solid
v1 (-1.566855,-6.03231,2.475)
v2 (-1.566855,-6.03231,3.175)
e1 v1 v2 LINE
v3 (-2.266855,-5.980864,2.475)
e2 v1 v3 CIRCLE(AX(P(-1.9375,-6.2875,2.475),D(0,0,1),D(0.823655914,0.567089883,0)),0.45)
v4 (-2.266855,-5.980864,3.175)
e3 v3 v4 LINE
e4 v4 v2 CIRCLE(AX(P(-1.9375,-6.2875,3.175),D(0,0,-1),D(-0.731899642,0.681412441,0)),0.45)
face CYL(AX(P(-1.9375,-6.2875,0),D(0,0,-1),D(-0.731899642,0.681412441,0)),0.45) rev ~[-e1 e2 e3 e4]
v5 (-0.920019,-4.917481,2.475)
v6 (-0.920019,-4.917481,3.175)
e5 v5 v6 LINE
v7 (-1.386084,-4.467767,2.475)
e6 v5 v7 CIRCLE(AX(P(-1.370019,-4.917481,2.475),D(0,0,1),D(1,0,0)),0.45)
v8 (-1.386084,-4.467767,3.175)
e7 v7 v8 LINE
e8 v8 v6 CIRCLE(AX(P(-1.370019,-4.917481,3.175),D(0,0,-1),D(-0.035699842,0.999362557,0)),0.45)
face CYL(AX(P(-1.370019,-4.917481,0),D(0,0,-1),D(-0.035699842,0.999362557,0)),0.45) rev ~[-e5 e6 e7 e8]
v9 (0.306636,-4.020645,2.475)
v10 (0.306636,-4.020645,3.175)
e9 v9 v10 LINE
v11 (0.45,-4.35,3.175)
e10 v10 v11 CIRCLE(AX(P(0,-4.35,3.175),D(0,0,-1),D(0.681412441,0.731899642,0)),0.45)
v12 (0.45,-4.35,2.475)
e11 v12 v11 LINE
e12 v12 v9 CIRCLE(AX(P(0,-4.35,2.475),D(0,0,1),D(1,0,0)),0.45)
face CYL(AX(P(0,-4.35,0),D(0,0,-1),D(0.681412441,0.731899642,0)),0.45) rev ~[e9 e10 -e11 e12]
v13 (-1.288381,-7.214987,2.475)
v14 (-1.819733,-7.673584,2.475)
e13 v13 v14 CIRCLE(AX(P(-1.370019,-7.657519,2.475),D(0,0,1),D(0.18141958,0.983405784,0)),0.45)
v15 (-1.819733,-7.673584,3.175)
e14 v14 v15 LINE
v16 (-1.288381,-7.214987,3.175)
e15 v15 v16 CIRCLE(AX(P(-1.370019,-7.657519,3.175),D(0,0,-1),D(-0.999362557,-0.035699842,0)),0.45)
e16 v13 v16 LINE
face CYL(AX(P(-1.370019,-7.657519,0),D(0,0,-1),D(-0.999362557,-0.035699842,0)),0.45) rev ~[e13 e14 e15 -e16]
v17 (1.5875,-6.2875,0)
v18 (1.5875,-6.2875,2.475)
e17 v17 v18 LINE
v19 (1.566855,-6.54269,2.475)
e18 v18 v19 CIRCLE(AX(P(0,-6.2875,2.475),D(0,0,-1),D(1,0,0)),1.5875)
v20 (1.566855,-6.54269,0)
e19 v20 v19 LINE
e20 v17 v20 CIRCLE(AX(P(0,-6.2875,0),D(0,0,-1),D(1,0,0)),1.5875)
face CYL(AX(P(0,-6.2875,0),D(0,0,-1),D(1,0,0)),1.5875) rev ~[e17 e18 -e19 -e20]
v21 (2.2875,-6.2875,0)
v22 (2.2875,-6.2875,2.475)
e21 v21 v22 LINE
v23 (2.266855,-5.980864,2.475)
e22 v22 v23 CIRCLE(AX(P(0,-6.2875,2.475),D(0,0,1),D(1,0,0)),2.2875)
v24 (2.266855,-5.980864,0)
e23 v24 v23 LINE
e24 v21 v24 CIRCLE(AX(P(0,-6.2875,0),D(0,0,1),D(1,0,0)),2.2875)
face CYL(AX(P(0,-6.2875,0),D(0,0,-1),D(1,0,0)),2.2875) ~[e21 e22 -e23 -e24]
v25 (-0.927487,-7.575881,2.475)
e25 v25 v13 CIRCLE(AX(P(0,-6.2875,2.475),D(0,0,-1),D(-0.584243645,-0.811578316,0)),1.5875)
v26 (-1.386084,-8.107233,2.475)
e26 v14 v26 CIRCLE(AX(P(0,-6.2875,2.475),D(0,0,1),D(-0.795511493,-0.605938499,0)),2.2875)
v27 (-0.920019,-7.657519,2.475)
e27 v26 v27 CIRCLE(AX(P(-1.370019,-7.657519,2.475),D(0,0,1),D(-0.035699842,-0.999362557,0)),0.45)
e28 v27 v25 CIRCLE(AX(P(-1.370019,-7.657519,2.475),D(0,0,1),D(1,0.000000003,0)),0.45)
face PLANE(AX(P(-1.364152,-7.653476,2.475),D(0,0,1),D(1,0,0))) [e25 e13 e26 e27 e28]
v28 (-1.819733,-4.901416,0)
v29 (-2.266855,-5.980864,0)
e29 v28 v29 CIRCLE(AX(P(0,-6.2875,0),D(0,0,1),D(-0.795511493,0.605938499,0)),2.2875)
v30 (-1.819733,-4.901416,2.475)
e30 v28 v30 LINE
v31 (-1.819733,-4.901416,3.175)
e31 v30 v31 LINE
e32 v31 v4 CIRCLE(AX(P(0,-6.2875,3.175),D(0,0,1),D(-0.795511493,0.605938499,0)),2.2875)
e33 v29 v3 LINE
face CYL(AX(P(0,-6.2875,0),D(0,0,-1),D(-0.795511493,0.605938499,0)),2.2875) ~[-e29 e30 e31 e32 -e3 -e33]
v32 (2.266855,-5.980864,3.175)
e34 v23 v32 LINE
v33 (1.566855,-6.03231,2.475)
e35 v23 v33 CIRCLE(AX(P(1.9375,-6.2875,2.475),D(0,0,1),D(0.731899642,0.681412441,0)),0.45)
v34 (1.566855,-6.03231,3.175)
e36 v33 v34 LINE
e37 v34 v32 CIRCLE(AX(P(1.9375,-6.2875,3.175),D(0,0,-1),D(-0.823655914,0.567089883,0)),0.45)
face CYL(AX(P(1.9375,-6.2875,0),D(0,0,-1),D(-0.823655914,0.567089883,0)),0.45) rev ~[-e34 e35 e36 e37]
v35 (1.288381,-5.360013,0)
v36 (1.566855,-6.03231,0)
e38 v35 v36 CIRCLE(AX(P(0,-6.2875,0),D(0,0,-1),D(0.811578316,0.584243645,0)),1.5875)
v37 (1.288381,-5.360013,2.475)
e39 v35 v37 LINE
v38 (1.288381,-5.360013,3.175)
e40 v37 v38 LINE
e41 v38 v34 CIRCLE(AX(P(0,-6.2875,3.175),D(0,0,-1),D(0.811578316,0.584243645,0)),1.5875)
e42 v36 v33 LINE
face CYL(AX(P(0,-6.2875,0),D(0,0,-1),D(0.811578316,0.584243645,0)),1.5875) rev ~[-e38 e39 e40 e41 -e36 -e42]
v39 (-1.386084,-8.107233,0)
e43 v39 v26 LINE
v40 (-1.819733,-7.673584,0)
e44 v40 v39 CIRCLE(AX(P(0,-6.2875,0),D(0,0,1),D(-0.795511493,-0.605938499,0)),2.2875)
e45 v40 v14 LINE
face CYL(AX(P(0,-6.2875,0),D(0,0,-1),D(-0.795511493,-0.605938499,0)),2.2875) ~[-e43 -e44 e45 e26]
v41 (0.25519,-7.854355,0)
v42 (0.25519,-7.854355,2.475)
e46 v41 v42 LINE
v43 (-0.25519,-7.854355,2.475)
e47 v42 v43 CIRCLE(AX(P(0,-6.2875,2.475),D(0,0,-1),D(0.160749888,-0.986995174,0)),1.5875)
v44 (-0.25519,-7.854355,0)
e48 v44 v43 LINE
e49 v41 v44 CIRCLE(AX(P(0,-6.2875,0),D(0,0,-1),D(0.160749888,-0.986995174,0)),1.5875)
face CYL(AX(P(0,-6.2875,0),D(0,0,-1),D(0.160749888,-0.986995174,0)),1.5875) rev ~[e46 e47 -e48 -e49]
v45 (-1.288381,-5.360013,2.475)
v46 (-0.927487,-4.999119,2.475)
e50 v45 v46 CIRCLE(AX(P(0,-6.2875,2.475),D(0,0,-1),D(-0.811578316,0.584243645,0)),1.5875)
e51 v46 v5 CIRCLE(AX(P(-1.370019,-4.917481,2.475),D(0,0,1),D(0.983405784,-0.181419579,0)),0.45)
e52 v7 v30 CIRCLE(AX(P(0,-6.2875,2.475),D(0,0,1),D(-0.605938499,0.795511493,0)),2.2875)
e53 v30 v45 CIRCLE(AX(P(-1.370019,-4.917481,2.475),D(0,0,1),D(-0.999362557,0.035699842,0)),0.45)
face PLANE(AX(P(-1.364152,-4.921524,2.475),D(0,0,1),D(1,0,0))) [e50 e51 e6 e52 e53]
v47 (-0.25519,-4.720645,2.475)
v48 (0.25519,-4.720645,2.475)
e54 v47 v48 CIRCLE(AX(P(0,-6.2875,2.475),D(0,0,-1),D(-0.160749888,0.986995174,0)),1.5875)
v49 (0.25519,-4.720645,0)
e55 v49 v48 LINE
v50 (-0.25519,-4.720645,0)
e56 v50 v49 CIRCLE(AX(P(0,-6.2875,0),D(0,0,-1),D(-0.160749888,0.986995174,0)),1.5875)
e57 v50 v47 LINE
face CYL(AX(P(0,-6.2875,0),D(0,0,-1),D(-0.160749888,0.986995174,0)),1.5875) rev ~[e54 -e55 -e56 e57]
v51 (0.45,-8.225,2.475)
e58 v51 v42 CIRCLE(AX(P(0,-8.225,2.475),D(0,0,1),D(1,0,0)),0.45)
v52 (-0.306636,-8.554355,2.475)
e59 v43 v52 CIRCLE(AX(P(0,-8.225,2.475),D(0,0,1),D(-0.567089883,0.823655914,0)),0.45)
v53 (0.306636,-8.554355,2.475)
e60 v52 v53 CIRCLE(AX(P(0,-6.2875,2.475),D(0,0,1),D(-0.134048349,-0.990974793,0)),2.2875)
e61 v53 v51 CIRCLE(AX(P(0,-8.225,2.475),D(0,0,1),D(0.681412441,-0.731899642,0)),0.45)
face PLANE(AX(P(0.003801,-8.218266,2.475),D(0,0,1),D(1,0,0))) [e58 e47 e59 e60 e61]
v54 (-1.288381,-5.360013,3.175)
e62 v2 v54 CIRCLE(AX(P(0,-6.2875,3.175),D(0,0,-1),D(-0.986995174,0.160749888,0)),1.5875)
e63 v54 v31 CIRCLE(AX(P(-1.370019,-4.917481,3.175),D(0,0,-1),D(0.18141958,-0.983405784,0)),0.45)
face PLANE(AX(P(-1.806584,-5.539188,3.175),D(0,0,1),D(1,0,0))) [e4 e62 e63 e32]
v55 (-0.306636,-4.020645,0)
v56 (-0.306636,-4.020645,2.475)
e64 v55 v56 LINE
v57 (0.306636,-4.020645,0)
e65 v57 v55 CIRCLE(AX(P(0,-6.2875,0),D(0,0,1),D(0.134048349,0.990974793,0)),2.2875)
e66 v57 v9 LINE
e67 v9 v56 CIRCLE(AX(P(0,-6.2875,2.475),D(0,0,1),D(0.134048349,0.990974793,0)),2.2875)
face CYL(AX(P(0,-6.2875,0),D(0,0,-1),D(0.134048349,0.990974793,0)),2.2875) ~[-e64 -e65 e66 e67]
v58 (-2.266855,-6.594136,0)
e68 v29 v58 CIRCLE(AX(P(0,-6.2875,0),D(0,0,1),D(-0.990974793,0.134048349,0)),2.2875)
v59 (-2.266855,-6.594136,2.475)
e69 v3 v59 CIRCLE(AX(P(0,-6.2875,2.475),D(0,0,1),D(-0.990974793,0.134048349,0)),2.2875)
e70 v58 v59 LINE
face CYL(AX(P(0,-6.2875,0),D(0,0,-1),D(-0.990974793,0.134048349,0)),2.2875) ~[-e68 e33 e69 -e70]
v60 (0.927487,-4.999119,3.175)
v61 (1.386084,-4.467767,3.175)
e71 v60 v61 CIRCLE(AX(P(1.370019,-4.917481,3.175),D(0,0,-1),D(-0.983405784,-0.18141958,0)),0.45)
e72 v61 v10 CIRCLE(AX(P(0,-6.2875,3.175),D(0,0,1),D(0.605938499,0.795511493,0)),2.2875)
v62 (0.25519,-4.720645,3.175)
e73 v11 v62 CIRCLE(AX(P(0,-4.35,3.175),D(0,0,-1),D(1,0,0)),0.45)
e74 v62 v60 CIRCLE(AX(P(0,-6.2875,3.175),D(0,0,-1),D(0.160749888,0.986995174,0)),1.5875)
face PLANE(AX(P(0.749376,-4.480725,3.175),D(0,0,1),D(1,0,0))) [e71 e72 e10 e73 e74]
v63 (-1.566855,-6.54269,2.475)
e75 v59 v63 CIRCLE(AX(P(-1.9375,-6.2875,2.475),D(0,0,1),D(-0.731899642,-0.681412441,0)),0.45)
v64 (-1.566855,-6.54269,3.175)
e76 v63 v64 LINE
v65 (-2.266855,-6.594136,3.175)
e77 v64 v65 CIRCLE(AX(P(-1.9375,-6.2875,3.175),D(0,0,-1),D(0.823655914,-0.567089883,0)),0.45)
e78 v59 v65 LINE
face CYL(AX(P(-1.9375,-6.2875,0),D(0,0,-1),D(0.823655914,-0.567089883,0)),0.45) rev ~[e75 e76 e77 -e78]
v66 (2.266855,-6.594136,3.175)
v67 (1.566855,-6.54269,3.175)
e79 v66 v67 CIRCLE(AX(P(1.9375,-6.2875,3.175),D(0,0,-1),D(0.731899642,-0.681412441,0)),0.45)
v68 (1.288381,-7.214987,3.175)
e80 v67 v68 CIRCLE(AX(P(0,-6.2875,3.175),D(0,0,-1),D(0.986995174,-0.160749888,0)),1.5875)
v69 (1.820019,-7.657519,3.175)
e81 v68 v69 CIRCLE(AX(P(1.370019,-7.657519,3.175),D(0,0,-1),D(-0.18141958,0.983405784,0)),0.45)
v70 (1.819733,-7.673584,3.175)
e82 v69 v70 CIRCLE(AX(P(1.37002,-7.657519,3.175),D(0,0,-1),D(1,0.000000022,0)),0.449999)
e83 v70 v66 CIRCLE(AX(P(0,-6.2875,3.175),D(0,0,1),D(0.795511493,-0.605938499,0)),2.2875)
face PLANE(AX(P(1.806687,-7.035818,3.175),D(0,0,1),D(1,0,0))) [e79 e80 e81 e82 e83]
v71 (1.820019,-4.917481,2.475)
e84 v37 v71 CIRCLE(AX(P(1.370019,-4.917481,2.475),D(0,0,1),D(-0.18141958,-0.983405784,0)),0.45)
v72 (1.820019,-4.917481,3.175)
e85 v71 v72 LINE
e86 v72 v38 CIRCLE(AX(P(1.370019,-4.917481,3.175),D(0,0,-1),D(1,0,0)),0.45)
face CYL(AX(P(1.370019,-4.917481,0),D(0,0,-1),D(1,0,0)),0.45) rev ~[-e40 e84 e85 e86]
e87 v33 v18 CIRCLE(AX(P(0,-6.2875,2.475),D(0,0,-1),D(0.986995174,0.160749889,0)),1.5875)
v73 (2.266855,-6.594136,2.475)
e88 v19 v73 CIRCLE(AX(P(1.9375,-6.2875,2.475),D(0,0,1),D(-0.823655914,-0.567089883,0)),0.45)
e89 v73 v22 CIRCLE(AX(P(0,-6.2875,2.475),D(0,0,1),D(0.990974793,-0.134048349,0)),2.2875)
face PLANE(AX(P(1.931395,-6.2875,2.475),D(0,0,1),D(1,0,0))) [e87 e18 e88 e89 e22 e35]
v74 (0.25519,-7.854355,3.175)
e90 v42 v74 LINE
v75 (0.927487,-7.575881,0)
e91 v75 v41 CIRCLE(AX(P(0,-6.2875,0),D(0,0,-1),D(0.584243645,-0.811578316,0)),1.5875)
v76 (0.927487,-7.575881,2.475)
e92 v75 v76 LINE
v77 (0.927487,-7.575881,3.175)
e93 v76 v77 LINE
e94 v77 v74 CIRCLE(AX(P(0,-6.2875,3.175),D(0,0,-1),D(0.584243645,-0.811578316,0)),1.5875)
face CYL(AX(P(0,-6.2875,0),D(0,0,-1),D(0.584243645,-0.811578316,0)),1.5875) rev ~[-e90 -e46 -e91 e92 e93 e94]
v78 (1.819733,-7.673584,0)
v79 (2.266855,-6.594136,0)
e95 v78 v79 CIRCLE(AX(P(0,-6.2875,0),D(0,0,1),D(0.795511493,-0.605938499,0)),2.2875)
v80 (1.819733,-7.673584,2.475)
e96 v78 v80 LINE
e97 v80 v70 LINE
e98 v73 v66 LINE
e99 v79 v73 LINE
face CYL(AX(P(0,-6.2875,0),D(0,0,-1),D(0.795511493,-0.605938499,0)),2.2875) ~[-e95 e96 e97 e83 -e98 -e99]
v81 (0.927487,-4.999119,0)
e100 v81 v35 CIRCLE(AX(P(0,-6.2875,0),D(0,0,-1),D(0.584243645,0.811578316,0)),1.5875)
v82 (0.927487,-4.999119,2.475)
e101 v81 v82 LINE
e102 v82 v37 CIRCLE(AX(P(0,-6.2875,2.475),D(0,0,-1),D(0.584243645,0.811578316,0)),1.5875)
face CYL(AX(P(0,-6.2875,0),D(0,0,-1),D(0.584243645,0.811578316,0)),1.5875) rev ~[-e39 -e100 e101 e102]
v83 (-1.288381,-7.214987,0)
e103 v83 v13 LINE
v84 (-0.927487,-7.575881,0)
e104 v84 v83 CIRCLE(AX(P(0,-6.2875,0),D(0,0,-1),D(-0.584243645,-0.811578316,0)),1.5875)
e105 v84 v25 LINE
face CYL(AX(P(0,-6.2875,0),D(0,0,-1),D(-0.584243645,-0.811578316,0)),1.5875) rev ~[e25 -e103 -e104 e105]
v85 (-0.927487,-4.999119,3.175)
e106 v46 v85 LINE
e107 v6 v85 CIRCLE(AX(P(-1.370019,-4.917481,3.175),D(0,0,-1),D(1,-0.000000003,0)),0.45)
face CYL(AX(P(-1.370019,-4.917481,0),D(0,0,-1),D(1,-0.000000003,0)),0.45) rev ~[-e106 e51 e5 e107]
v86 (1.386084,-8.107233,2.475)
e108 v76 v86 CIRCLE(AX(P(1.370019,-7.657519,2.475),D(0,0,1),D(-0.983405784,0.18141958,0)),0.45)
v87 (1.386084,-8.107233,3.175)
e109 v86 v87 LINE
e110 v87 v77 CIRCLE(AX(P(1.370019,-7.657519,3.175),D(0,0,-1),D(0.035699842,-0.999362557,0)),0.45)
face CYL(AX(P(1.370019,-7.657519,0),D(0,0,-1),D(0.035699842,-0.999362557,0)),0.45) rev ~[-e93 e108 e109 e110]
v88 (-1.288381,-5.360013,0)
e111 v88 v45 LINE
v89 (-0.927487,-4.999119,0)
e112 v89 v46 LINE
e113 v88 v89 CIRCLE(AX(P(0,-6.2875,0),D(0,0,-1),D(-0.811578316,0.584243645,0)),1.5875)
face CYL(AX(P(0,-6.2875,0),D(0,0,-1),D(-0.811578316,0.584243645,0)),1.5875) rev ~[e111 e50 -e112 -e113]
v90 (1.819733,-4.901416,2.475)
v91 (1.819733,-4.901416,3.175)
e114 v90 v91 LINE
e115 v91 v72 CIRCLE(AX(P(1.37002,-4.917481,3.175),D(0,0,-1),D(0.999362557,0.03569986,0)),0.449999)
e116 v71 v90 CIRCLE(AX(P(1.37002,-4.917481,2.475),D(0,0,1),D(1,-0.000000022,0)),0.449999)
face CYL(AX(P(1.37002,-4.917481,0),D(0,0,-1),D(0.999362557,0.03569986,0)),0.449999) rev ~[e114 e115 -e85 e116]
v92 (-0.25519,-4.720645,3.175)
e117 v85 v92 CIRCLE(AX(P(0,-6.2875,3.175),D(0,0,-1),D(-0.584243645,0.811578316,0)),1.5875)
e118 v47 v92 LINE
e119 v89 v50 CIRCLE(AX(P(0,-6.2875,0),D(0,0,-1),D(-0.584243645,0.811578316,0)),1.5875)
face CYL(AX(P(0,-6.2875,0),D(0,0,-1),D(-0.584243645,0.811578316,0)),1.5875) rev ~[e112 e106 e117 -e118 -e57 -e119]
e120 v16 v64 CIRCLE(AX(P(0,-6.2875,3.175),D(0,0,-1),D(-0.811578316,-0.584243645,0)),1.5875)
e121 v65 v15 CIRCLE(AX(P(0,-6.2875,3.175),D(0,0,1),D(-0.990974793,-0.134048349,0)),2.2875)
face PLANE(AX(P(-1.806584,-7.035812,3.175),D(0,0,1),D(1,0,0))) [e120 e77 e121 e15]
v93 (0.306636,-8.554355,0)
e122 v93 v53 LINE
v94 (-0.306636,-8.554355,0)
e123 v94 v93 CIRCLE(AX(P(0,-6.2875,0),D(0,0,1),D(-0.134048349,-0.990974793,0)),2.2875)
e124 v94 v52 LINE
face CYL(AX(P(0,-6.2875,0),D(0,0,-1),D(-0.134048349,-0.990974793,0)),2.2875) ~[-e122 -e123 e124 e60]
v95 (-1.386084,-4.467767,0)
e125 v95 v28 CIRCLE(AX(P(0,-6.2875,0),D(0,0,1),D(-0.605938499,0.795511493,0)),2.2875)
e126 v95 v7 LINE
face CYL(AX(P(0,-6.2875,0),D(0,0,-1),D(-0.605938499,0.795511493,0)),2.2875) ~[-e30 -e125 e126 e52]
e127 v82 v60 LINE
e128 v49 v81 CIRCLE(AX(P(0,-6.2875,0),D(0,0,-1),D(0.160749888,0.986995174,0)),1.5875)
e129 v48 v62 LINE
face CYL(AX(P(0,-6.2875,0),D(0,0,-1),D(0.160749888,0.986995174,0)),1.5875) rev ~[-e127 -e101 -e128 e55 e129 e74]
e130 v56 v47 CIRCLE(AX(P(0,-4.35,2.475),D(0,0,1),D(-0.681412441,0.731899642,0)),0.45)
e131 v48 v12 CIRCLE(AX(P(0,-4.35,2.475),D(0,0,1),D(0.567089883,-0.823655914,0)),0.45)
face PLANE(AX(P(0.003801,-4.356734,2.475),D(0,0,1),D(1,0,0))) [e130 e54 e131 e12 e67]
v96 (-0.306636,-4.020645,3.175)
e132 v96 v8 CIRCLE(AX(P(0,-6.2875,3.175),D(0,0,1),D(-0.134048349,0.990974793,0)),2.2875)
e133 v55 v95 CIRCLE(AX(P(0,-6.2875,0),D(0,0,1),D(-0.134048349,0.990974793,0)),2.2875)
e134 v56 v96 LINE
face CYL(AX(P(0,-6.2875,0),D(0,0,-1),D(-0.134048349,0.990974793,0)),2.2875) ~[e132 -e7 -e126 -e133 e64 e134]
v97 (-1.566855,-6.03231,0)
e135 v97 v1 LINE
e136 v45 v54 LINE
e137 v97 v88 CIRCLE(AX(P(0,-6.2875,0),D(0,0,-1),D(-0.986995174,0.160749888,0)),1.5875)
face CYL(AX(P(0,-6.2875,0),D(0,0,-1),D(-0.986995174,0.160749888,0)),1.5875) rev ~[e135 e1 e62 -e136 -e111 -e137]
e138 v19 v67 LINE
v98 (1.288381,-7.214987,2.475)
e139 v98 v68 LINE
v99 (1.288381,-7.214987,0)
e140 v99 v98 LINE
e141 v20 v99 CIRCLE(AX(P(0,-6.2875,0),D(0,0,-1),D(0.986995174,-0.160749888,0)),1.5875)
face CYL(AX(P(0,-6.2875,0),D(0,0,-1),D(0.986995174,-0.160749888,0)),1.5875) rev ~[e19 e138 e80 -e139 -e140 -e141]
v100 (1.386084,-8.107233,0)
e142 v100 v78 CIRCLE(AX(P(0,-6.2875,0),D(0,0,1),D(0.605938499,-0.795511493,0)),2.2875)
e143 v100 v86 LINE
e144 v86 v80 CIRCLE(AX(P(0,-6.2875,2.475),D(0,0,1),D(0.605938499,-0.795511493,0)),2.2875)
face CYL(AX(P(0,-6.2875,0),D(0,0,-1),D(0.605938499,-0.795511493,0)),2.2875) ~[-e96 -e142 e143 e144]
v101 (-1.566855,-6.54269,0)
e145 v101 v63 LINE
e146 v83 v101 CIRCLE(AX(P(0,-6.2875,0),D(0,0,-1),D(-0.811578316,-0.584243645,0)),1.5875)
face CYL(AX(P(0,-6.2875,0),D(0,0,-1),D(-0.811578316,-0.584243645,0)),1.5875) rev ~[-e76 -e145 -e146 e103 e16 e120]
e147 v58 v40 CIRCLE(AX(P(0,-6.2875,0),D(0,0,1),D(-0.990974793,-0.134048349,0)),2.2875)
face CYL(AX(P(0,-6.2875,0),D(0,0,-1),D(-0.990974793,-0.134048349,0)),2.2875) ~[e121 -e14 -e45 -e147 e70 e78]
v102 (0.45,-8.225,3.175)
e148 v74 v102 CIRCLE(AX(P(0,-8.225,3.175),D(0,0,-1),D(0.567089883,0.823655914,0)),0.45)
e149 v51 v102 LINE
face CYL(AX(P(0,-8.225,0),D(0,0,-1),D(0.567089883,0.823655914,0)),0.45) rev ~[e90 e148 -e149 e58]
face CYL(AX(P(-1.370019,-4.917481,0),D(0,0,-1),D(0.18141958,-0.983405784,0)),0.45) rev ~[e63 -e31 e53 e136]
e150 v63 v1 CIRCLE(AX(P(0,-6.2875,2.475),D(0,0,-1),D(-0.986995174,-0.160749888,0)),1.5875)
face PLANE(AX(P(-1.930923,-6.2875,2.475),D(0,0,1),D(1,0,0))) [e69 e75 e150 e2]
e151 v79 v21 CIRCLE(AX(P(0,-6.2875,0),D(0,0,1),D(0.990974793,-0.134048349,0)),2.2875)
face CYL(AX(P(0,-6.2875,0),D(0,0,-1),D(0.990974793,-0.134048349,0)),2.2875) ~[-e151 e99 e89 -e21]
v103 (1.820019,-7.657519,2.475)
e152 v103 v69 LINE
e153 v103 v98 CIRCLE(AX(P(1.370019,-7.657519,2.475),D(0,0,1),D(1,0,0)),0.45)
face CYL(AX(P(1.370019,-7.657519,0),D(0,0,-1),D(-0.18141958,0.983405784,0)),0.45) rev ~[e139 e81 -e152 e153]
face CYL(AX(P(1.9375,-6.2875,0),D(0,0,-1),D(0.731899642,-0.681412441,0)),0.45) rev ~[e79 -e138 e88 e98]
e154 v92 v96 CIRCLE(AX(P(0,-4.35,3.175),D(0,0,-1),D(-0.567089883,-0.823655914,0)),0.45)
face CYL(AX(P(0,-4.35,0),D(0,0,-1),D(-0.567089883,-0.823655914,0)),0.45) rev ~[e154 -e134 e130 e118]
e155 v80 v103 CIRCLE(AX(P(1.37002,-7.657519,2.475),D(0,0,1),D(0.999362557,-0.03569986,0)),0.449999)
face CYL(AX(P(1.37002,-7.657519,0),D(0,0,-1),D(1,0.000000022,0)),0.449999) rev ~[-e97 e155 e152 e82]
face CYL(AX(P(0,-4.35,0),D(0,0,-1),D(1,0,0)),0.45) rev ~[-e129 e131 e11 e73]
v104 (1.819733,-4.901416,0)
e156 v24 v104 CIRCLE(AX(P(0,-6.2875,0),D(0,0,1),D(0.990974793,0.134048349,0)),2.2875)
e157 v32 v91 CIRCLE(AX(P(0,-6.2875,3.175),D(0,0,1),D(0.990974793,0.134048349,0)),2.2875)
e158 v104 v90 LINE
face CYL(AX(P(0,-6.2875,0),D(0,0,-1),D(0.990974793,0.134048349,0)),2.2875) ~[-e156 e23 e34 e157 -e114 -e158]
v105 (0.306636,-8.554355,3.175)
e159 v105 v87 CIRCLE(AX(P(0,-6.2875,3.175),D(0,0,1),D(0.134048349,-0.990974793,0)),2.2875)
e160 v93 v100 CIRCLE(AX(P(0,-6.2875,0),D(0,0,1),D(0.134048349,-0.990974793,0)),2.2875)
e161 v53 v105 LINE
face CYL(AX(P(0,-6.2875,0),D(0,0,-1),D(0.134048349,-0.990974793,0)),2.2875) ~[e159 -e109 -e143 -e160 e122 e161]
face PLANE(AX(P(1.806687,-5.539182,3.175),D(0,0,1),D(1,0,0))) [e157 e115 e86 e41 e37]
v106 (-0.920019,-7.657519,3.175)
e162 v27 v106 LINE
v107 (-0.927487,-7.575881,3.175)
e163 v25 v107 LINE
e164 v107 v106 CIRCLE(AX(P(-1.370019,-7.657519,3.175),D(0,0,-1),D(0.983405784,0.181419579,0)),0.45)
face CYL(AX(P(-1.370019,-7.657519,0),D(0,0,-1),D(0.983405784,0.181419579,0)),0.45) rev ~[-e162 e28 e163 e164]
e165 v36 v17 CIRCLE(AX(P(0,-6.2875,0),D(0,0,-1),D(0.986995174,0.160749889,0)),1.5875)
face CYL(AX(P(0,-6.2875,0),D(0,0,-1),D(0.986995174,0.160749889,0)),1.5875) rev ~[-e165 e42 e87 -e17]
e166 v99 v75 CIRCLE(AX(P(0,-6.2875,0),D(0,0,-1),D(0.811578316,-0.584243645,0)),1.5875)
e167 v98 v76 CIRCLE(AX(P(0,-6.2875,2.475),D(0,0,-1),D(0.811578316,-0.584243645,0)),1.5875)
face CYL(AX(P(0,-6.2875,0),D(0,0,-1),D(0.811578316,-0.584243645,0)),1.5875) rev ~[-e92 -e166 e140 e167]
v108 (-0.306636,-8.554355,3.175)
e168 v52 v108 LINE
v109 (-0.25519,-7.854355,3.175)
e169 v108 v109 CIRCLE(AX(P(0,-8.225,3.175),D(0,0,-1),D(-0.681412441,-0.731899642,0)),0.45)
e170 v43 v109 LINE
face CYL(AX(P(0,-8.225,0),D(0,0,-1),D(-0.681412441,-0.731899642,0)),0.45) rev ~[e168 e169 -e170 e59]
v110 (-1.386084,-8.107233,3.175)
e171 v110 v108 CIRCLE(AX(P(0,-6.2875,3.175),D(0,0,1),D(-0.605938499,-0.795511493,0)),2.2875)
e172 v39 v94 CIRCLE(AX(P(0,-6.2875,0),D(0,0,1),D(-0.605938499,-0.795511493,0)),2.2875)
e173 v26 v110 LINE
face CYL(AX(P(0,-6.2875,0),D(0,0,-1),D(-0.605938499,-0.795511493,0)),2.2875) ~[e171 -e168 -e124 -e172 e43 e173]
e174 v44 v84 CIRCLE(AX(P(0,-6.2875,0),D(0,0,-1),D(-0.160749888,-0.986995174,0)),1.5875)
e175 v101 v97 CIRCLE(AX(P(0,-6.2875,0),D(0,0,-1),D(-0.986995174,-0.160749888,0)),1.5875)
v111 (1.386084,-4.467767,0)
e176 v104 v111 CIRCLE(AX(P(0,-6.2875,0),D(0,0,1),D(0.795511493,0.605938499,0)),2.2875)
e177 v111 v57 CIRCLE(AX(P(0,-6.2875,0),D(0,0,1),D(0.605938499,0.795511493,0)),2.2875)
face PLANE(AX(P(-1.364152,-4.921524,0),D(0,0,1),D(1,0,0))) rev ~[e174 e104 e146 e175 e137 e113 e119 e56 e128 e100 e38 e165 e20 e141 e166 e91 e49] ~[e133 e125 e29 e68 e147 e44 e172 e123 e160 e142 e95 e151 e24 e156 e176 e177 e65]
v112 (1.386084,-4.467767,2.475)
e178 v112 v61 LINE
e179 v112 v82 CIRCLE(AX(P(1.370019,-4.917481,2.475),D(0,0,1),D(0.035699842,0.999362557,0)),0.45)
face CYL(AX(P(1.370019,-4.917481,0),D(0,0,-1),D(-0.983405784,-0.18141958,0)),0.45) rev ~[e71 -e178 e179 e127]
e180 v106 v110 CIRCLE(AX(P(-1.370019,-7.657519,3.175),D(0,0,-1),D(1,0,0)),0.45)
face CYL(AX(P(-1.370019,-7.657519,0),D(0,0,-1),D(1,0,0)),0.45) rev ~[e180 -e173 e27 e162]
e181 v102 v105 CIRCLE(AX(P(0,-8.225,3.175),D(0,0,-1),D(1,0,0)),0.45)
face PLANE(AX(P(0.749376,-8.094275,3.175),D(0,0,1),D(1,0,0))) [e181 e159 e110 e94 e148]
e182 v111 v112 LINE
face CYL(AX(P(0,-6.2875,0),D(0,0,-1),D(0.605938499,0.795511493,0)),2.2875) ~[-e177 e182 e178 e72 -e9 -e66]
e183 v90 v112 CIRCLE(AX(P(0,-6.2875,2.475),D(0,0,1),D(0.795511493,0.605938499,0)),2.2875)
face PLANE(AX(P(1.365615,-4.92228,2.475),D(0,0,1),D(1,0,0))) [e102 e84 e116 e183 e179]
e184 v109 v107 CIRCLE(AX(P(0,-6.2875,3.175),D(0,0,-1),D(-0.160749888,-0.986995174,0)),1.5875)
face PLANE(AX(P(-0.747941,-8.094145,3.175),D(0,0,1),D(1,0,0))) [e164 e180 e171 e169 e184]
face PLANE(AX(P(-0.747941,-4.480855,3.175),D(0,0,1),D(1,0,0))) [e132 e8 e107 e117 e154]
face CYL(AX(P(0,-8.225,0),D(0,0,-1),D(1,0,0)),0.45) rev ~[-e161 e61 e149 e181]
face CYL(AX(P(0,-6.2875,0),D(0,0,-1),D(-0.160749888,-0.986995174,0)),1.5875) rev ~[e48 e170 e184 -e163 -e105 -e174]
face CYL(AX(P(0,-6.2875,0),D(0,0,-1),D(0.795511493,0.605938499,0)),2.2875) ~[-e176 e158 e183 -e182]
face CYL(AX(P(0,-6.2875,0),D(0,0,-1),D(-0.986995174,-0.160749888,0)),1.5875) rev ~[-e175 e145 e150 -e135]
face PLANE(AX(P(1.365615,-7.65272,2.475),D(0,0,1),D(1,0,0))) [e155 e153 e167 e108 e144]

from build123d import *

# Parameters (mm, degrees)
F1_DEPTH = 3.175
F2_DEPTH = 2.475


# Not quite as in the source:
# - a length typed as a fraction of an inch, garbled in the dataset ("3 / 203.2 mm" for 3/8 in), is restored


with BuildPart() as f1:
    # F0 (on Top) → F1 (new body)
    with BuildSketch(Plane.XY):
        with BuildLine():
            ThreePointArc((-1.5668548387, -6.0323095527), (-1.4666587579, -5.6799900511), (-1.2883805774, -5.3600132142))
            ThreePointArc((-1.2883805774, -5.3600132142), (-1.6640391224, -5.2581452502), (-1.8197325394, -4.9014156826))
            ThreePointArc((-1.8197325394, -4.9014156826), (-2.1133744306, -5.4121116485), (-2.2668548387, -5.9808644016))
            ThreePointArc((-2.2668548387, -5.9808644016), (-1.9045170714, -5.8387103762), (-1.5668548387, -6.0323095527))
        make_face()
    extrude(amount=F1_DEPTH)



with BuildPart() as f1b:
    # F0 (on Top) → F1, piece 2 (new body)
    with BuildSketch(Plane.XY):
        with BuildLine():
            ThreePointArc((-0.9274867858, -4.9991194226), (-0.6075099489, -4.8208412421), (-0.2551904473, -4.7206451613))
            ThreePointArc((-0.2551904473, -4.7206451613), (-0.4487896238, -4.3829829286), (-0.3066355984, -4.0206451613))
            ThreePointArc((-0.3066355984, -4.0206451613), (-0.8753883515, -4.1741255694), (-1.3860843174, -4.4677674606))
            ThreePointArc((-1.3860843174, -4.4677674606), (-1.0575527647, -4.5936525568), (-0.9200193885, -4.9174806115))
            ThreePointArc((-0.9200193885, -4.9174806115), (-0.9218901264, -4.9584704197), (-0.9274867858, -4.9991194226))
        make_face()
    extrude(amount=F1_DEPTH)


with BuildPart() as f1c:
    # F0 (on Top) → F1, piece 3 (new body)
    with BuildSketch(Plane.XY):
        with BuildLine():
            ThreePointArc((0.2551904473, -4.7206451613), (0.6075099489, -4.8208412421), (0.9274867858, -4.9991194226))
            ThreePointArc((0.9274867858, -4.9991194226), (1.0293547498, -4.6234608776), (1.3860843174, -4.4677674606))
            ThreePointArc((1.3860843174, -4.4677674606), (0.8753883515, -4.1741255694), (0.3066355984, -4.0206451613))
            ThreePointArc((0.3066355984, -4.0206451613), (0.4126051498, -4.1703976883), (0.45, -4.35))
            ThreePointArc((0.45, -4.35), (0.3983313328, -4.559361289), (0.2551904473, -4.7206451613))
        make_face()
    extrude(amount=F1_DEPTH)


with BuildPart() as f1d:
    # F0 (on Top) → F1, piece 4 (new body)
    with BuildSketch(Plane.XY):
        with BuildLine():
            ThreePointArc((1.2883805774, -5.3600132142), (1.4666587579, -5.6799900511), (1.5668548387, -6.0323095527))
            ThreePointArc((1.5668548387, -6.0323095527), (1.9045170714, -5.8387103762), (2.2668548387, -5.9808644016))
            ThreePointArc((2.2668548387, -5.9808644016), (2.1133744306, -5.4121116485), (1.8197325394, -4.9014156826))
            ThreePointArc((1.8197325394, -4.9014156826), (1.8199476706, -4.9094468667), (1.8200193885, -4.9174806115))
            ThreePointArc((1.8200193885, -4.9174806115), (1.6579104573, -5.2633400229), (1.2883805774, -5.3600132142))
        make_face()
    extrude(amount=F1_DEPTH)


with BuildPart() as f1e:
    # F0 (on Top) → F1, piece 5 (new body)
    with BuildSketch(Plane.XY):
        with BuildLine():
            ThreePointArc((2.2668548387, -6.5941355984), (1.9045170714, -6.7362896238), (1.5668548387, -6.5426904473))
            ThreePointArc((1.5668548387, -6.5426904473), (1.4666587579, -6.8950099489), (1.2883805774, -7.2149867858))
            ThreePointArc((1.2883805774, -7.2149867858), (1.6579104573, -7.3116599771), (1.8200193885, -7.6575193885))
            ThreePointArc((1.8200193885, -7.6575193885), (1.8199476706, -7.6655531333), (1.8197325394, -7.6735843174))
            ThreePointArc((1.8197325394, -7.6735843174), (2.1133744306, -7.1628883515), (2.2668548387, -6.5941355984))
        make_face()
    extrude(amount=F1_DEPTH)


with BuildPart() as f1f:
    # F0 (on Top) → F1, piece 6 (new body)
    with BuildSketch(Plane.XY):
        with BuildLine():
            ThreePointArc((1.3860843174, -8.1072325394), (1.0293547498, -7.9515391224), (0.9274867858, -7.5758805774))
            ThreePointArc((0.9274867858, -7.5758805774), (0.6075099489, -7.7541587579), (0.2551904473, -7.8543548387))
            ThreePointArc((0.2551904473, -7.8543548387), (0.3983313328, -8.015638711), (0.45, -8.225))
            ThreePointArc((0.45, -8.225), (0.4126051498, -8.4046023117), (0.3066355984, -8.5543548387))
            ThreePointArc((0.3066355984, -8.5543548387), (0.8753883515, -8.4008744306), (1.3860843174, -8.1072325394))
        make_face()
    extrude(amount=F1_DEPTH)


with BuildPart() as f1g:
    # F0 (on Top) → F1, piece 7 (new body)
    with BuildSketch(Plane.XY):
        with BuildLine():
            ThreePointArc((-0.3066355984, -8.5543548387), (-0.4487896238, -8.1920170714), (-0.2551904473, -7.8543548387))
            ThreePointArc((-0.2551904473, -7.8543548387), (-0.6075099489, -7.7541587579), (-0.9274867858, -7.5758805774))
            ThreePointArc((-0.9274867858, -7.5758805774), (-0.9218901264, -7.6165295803), (-0.9200193885, -7.6575193885))
            ThreePointArc((-0.9200193885, -7.6575193885), (-1.0575527647, -7.9813474432), (-1.3860843174, -8.1072325394))
            ThreePointArc((-1.3860843174, -8.1072325394), (-0.8753883515, -8.4008744306), (-0.3066355984, -8.5543548387))
        make_face()
    extrude(amount=F1_DEPTH)


with BuildPart() as f1h:
    # F0 (on Top) → F1, piece 8 (new body)
    with BuildSketch(Plane.XY):
        with BuildLine():
            ThreePointArc((-1.8197325394, -7.6735843174), (-1.6640391224, -7.3168547498), (-1.2883805774, -7.2149867858))
            ThreePointArc((-1.2883805774, -7.2149867858), (-1.4666587579, -6.8950099489), (-1.5668548387, -6.5426904473))
            ThreePointArc((-1.5668548387, -6.5426904473), (-1.9045170714, -6.7362896238), (-2.2668548387, -6.5941355984))
            ThreePointArc((-2.2668548387, -6.5941355984), (-2.1133744306, -7.1628883515), (-1.8197325394, -7.6735843174))
        make_face()
    extrude(amount=F1_DEPTH)


with BuildPart() as f1_1:
    add(f1.part)

    add(f1b.part)  # F2 merges F1b

    add(f1c.part)  # F2 merges F1c

    add(f1d.part)  # F2 merges F1d

    add(f1e.part)  # F2 merges F1e

    add(f1f.part)  # F2 merges F1f

    add(f1g.part)  # F2 merges F1g

    add(f1h.part)  # F2 merges F1h
    # F0 (on Top) → F2 (join)
    with BuildSketch(Plane.XY):
        with BuildLine():
            ThreePointArc((-1.2883805774, -5.3600132142), (-1.1225320151, -5.1649679849), (-0.9274867858, -4.9991194226))
            ThreePointArc((-0.9274867858, -4.9991194226), (-0.9218901264, -4.9584704197), (-0.9200193885, -4.9174806115))
            ThreePointArc((-0.9200193885, -4.9174806115), (-1.0575527647, -4.5936525568), (-1.3860843174, -4.4677674606))
            ThreePointArc((-1.3860843174, -4.4677674606), (-1.617506762, -4.669993238), (-1.8197325394, -4.9014156826))
            ThreePointArc((-1.8197325394, -4.9014156826), (-1.6640391224, -5.2581452502), (-1.2883805774, -5.3600132142))
        make_face()
        with BuildLine():
            ThreePointArc((-0.2551904473, -4.7206451613), (0, -4.7), (0.2551904473, -4.7206451613))
            ThreePointArc((0.2551904473, -4.7206451613), (0.3983313328, -4.559361289), (0.45, -4.35))
            ThreePointArc((0.45, -4.35), (0.4126051498, -4.1703976883), (0.3066355984, -4.0206451613))
            ThreePointArc((0.3066355984, -4.0206451613), (0, -4), (-0.3066355984, -4.0206451613))
            ThreePointArc((-0.3066355984, -4.0206451613), (-0.4487896238, -4.3829829286), (-0.2551904473, -4.7206451613))
        make_face()
        with BuildLine():
            ThreePointArc((0.9274867858, -4.9991194226), (1.1225320151, -5.1649679849), (1.2883805774, -5.3600132142))
            ThreePointArc((1.2883805774, -5.3600132142), (1.6579104573, -5.2633400229), (1.8200193885, -4.9174806115))
            ThreePointArc((1.8200193885, -4.9174806115), (1.8199476706, -4.9094468667), (1.8197325394, -4.9014156826))
            ThreePointArc((1.8197325394, -4.9014156826), (1.617506762, -4.669993238), (1.3860843174, -4.4677674606))
            ThreePointArc((1.3860843174, -4.4677674606), (1.0293547498, -4.6234608776), (0.9274867858, -4.9991194226))
        make_face()
        with BuildLine():
            ThreePointArc((1.5668548387, -6.0323095527), (1.5823302921, -6.1594879038), (1.5875, -6.2875))
            ThreePointArc((1.5875, -6.2875), (1.5823302921, -6.4155120962), (1.5668548387, -6.5426904473))
            ThreePointArc((1.5668548387, -6.5426904473), (1.9045170714, -6.7362896238), (2.2668548387, -6.5941355984))
            ThreePointArc((2.2668548387, -6.5941355984), (2.2823328738, -6.4411649056), (2.2875, -6.2875))
            ThreePointArc((2.2875, -6.2875), (2.2823328738, -6.1338350944), (2.2668548387, -5.9808644016))
            ThreePointArc((2.2668548387, -5.9808644016), (1.9045170714, -5.8387103762), (1.5668548387, -6.0323095527))
        make_face()
        with BuildLine():
            ThreePointArc((1.8200193885, -7.6575193885), (1.6579104573, -7.3116599771), (1.2883805774, -7.2149867858))
            ThreePointArc((1.2883805774, -7.2149867858), (1.1225320151, -7.4100320151), (0.9274867858, -7.5758805774))
            ThreePointArc((0.9274867858, -7.5758805774), (1.0293547498, -7.9515391224), (1.3860843174, -8.1072325394))
            ThreePointArc((1.3860843174, -8.1072325394), (1.617506762, -7.905006762), (1.8197325394, -7.6735843174))
            ThreePointArc((1.8197325394, -7.6735843174), (1.8199476706, -7.6655531333), (1.8200193885, -7.6575193885))
        make_face()
        with BuildLine():
            ThreePointArc((0.45, -8.225), (0.3983313328, -8.015638711), (0.2551904473, -7.8543548387))
            ThreePointArc((0.2551904473, -7.8543548387), (0, -7.875), (-0.2551904473, -7.8543548387))
            ThreePointArc((-0.2551904473, -7.8543548387), (-0.4487896238, -8.1920170714), (-0.3066355984, -8.5543548387))
            ThreePointArc((-0.3066355984, -8.5543548387), (0, -8.575), (0.3066355984, -8.5543548387))
            ThreePointArc((0.3066355984, -8.5543548387), (0.4126051498, -8.4046023117), (0.45, -8.225))
        make_face()
        with BuildLine():
            ThreePointArc((-0.9200193885, -7.6575193885), (-0.9218901264, -7.6165295803), (-0.9274867858, -7.5758805774))
            ThreePointArc((-0.9274867858, -7.5758805774), (-1.1225320151, -7.4100320151), (-1.2883805774, -7.2149867858))
            ThreePointArc((-1.2883805774, -7.2149867858), (-1.6640391224, -7.3168547498), (-1.8197325394, -7.6735843174))
            ThreePointArc((-1.8197325394, -7.6735843174), (-1.617506762, -7.905006762), (-1.3860843174, -8.1072325394))
            ThreePointArc((-1.3860843174, -8.1072325394), (-1.0575527647, -7.9813474432), (-0.9200193885, -7.6575193885))
        make_face()
        with BuildLine():
            ThreePointArc((-1.5668548387, -6.5426904473), (-1.5875, -6.2875), (-1.5668548387, -6.0323095527))
            ThreePointArc((-1.5668548387, -6.0323095527), (-1.9045170714, -5.8387103762), (-2.2668548387, -5.9808644016))
            ThreePointArc((-2.2668548387, -5.9808644016), (-2.2875, -6.2875), (-2.2668548387, -6.5941355984))
            ThreePointArc((-2.2668548387, -6.5941355984), (-1.9045170714, -6.7362896238), (-1.5668548387, -6.5426904473))
        make_face()
    extrude(amount=F2_DEPTH)


solid = f1_1.part
